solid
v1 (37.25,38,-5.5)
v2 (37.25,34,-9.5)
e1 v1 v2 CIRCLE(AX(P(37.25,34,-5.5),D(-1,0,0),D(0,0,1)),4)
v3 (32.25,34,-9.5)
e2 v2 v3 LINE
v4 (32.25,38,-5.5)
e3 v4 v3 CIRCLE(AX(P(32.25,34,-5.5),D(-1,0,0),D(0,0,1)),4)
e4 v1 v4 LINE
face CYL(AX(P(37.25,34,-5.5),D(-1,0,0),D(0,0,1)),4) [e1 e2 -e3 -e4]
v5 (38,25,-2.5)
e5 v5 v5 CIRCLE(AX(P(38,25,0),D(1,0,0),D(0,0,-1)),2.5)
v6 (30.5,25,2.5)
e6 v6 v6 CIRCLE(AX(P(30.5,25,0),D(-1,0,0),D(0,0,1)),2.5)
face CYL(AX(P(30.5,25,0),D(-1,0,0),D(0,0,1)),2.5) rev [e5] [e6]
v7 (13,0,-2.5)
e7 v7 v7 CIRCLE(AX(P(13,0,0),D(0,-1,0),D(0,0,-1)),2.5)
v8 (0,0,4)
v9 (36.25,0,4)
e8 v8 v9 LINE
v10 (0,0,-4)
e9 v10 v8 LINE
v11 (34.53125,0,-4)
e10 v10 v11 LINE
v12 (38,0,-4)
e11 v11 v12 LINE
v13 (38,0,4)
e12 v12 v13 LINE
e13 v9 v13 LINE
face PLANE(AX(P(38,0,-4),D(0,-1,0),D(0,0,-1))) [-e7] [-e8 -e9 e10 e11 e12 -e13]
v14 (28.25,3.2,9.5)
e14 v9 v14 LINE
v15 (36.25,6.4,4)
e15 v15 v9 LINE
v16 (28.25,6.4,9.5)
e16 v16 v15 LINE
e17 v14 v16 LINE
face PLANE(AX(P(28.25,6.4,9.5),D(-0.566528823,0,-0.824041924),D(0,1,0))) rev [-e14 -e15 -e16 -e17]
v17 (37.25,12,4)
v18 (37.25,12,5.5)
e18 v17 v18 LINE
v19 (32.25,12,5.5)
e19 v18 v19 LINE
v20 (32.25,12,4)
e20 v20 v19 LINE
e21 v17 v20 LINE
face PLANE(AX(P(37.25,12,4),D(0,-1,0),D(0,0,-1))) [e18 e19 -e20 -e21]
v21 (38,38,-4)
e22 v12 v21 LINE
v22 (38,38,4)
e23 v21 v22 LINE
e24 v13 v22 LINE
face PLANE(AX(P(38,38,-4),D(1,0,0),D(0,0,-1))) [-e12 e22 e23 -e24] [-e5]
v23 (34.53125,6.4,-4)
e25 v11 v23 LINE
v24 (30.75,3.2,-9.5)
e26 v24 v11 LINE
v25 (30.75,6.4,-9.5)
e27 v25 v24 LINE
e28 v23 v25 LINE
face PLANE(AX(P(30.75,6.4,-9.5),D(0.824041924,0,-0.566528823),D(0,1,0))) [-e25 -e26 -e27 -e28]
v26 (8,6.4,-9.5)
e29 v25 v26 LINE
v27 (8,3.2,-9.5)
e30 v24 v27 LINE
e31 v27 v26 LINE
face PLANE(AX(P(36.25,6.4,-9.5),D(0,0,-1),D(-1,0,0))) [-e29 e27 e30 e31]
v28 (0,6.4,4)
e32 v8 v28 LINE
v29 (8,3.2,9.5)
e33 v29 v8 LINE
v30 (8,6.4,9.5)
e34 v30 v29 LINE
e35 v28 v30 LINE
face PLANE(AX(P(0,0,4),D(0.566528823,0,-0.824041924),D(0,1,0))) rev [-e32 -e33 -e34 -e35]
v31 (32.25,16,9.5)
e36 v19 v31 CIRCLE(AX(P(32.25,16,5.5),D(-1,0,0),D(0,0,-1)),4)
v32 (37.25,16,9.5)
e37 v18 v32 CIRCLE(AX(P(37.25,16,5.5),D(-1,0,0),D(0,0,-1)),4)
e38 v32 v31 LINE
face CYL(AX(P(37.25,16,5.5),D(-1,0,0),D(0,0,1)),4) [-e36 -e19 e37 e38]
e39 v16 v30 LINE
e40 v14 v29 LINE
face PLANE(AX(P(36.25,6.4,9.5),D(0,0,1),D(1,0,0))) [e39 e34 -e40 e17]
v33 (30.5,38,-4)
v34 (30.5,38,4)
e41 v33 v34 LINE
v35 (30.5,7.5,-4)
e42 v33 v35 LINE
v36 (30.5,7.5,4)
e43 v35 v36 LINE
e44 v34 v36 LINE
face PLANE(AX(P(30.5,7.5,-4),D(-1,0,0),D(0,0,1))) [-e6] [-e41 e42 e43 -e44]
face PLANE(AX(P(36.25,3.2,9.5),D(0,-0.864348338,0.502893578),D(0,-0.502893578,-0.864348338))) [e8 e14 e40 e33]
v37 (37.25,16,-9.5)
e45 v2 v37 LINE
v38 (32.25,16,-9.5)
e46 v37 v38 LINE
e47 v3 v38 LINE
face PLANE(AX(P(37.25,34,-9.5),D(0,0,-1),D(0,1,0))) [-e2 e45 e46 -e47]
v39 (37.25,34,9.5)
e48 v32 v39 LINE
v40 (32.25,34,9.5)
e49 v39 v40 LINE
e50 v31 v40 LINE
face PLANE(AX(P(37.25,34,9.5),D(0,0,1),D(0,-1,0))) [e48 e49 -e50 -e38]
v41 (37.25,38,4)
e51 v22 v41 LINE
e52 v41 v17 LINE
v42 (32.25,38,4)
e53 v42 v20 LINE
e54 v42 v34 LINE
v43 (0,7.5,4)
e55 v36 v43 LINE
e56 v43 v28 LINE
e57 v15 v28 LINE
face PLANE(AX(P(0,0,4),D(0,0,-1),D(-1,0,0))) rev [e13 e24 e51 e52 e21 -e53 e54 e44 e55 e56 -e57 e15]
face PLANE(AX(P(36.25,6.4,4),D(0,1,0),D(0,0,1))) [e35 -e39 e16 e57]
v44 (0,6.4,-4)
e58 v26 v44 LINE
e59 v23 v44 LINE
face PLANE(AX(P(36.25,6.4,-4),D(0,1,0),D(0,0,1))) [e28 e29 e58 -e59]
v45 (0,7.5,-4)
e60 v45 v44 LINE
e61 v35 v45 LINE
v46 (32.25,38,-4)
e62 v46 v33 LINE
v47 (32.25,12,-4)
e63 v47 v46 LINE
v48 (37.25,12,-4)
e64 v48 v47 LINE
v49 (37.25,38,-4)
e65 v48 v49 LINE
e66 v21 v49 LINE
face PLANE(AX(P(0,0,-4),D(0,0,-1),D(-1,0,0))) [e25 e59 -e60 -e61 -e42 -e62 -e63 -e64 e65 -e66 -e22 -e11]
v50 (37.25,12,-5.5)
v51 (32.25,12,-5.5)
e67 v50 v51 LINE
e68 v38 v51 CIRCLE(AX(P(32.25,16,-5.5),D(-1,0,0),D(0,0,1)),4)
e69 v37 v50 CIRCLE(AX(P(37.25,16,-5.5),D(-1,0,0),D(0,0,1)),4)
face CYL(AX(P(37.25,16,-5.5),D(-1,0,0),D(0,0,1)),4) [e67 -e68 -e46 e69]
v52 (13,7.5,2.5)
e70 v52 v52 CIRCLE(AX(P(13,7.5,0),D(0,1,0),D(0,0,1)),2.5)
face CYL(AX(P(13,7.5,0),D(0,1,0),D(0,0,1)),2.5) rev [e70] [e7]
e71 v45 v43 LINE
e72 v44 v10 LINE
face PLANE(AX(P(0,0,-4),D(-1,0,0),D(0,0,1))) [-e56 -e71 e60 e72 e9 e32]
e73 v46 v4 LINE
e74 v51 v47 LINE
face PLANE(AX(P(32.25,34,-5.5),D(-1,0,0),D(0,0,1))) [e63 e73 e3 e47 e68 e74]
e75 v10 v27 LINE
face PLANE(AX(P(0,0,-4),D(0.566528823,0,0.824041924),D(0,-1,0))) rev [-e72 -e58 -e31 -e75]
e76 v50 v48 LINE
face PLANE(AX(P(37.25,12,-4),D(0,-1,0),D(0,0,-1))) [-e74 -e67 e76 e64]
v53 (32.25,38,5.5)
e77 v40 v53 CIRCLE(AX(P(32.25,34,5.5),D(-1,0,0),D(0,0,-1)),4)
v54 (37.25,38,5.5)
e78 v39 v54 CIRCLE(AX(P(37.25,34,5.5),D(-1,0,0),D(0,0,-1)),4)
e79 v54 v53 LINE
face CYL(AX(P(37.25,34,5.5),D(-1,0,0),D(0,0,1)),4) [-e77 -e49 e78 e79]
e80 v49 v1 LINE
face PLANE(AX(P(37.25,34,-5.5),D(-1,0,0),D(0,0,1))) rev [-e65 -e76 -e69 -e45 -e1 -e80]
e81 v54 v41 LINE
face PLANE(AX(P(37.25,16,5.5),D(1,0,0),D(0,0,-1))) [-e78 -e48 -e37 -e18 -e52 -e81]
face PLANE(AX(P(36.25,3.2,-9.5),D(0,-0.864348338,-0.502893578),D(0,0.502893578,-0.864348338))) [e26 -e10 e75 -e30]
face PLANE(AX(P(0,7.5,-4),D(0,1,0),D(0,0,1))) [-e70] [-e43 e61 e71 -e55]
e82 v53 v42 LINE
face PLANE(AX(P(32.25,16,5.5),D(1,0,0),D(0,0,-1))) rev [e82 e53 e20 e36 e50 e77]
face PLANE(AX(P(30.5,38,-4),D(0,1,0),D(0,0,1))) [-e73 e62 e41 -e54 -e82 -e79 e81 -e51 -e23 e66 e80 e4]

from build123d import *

# Parameters (mm, degrees)
EXTRUDE_1_DEPTH        = 4
EXTRUDE_1_DEPTH_BACK   = 4
EXTRUDE_2_DEPTH        = 36.25
CHAMFER_1_SIZE         = 8
CHAMFER_1_SIZE_2       = 5.5
EXTRUDE_3_DEPTH        = 2.5
EXTRUDE_3_DEPTH_BACK   = 2.5
HOLE_WIZARD_M6_1_D     = 5
HOLE_WIZARD_M6_1_DEPTH = 17
HOLE_WIZARD_M6_1_TIP   = 1.502151548
HOLE_WIZARD_M6_2_D     = 5
HOLE_WIZARD_M6_2_DEPTH = 17
HOLE_WIZARD_M6_2_TIP   = 1.502151548


with BuildPart() as part:
    # 草图1 → 凸台-拉伸1 (new, two sides: drawn at the far end of the back side and taken through both)
    with BuildSketch(Plane.XY.offset(-EXTRUDE_1_DEPTH_BACK)):
        Polygon((0, 7.5), (30.5, 7.5), (30.5, 38), (38, 38), (38, 0), (0, 0), align=None)
    extrude(amount=EXTRUDE_1_DEPTH + EXTRUDE_1_DEPTH_BACK)

    # 草图2 → 凸台-拉伸2 (add)
    with BuildSketch(Plane.ZY):
        Polygon((4, 6.4), (9.5, 6.4), (9.5, 3.2), (4, 0), align=None)
        Polygon((-4, 0), (-4, 6.4), (-9.5, 6.4), (-9.5, 3.2), align=None)
    extrude(amount=-EXTRUDE_2_DEPTH)

    # 倒角1
    # the kernel refuses this chamfer: 8, 5.5 mm, written as the material it takes off along each edge
    with BuildSketch(Plane(origin=(36.25, 27.064204354, -9.5), x_dir=(0.021932761143399794, 0, 0.9997594480616957), z_dir=(0, -1, 0))) as chamfer_1_piece_1_section:
        Polygon((CHAMFER_1_SIZE * 0.999759448062, CHAMFER_1_SIZE * 0.0219327611434), (-CHAMFER_1_SIZE_2 * 0.0219327611434, CHAMFER_1_SIZE_2 * 0.999759448062), (0, 0), align=None)
    chamfer_1_piece_1 = extrude(amount=44.528408708, mode=Mode.PRIVATE)
    chamfer_1_piece_1 = split(chamfer_1_piece_1, bisect_by=Plane(origin=(34.285815681, 4.8, -4), z_dir=(0, 0, -1)), keep=Keep.TOP, mode=Mode.PRIVATE)
    add(chamfer_1_piece_1, mode=Mode.SUBTRACT)
    with BuildSketch(Plane(origin=(36.25, 27.064204354, 9.5), x_dir=(0.046364447759701236, 0, -0.9989245907394302), z_dir=(0, -1, 0))) as chamfer_1_piece_2_section:
        Polygon((CHAMFER_1_SIZE_2 * 0.998924590739, -CHAMFER_1_SIZE_2 * 0.0463644477597), (-CHAMFER_1_SIZE * 0.0463644477597, -CHAMFER_1_SIZE * 0.998924590739), (0, 0), align=None)
    chamfer_1_piece_2 = extrude(amount=44.528408708, mode=Mode.PRIVATE)
    chamfer_1_piece_2 = split(chamfer_1_piece_2, bisect_by=Plane(origin=(33.577095366, 4.8, 4), z_dir=(0, 0, 1)), keep=Keep.TOP, mode=Mode.PRIVATE)
    add(chamfer_1_piece_2, mode=Mode.SUBTRACT)
    with BuildSketch(Plane(origin=(0, 27.064204354, 9.5), x_dir=(-0.046364447759701714, 0, -0.9989245907394302), z_dir=(0, -1, 0))) as chamfer_1_piece_3:
        Polygon((CHAMFER_1_SIZE_2 * 0.998924590739, CHAMFER_1_SIZE_2 * 0.0463644477597), (-CHAMFER_1_SIZE * 0.0463644477597, CHAMFER_1_SIZE * 0.998924590739), (0, 0), align=None)
    extrude(amount=44.528408708, mode=Mode.SUBTRACT)
    with BuildSketch(Plane(origin=(0, 27.064204354, -9.5), x_dir=(-0.046364447759701714, 0, 0.9989245907394302), z_dir=(0, -1, 0))) as chamfer_1_piece_4:
        Polygon((CHAMFER_1_SIZE_2 * 0.998924590739, -CHAMFER_1_SIZE_2 * 0.0463644477597), (-CHAMFER_1_SIZE * 0.0463644477597, -CHAMFER_1_SIZE * 0.998924590739), (0, 0), align=None)
    extrude(amount=44.528408708, mode=Mode.SUBTRACT)

    # 草图3 → 凸台-拉伸3 (add, two sides: drawn at the far end of the back side and taken through both)
    with BuildSketch(Plane.ZY.offset(-34.75).offset(-EXTRUDE_3_DEPTH_BACK)):
        with BuildLine():
            Line((4, 38), (5.5, 38))
            ThreePointArc((5.5, 38), (8.328427125, 36.828427125), (9.5, 34))
            Line((9.5, 34), (9.5, 16))
            ThreePointArc((9.5, 16), (8.328427125, 13.171572875), (5.5, 12))
            Line((5.5, 12), (4, 12))
            Line((4, 12), (4, 38))
        make_face()
        with BuildLine():
            Line((-9.5, 34), (-9.5, 16))
            ThreePointArc((-9.5, 16), (-8.328427125, 13.171572875), (-5.5, 12))
            Line((-5.5, 12), (-4, 12))
            Line((-4, 12), (-4, 38))
            Line((-4, 38), (-5.5, 38))
            ThreePointArc((-5.5, 38), (-8.328427125, 36.828427125), (-9.5, 34))
        make_face()
    extrude(amount=EXTRUDE_3_DEPTH + EXTRUDE_3_DEPTH_BACK)

    # M6 螺纹孔1
    with Locations(Plane(origin=(30.5, 25, 0), x_dir=(0, 0, -1), z_dir=(-1, 0, 0))):
        with Locations((0, 0)):
            Hole(HOLE_WIZARD_M6_1_D / 2, depth=HOLE_WIZARD_M6_1_DEPTH)
            with Locations((0, 0, -(HOLE_WIZARD_M6_1_DEPTH + HOLE_WIZARD_M6_1_TIP / 2))):  # 118° drill point
                Cone(0, HOLE_WIZARD_M6_1_D / 2, HOLE_WIZARD_M6_1_TIP, mode=Mode.SUBTRACT)

    # M6 螺纹孔2
    with Locations(Plane(origin=(13, 7.5, 0), x_dir=(0, 0, 1), z_dir=(0, 1, 0))):
        with Locations((0, 0)):
            Hole(HOLE_WIZARD_M6_2_D / 2, depth=HOLE_WIZARD_M6_2_DEPTH)
            with Locations((0, 0, -(HOLE_WIZARD_M6_2_DEPTH + HOLE_WIZARD_M6_2_TIP / 2))):  # 118° drill point
                Cone(0, HOLE_WIZARD_M6_2_D / 2, HOLE_WIZARD_M6_2_TIP, mode=Mode.SUBTRACT)


solid = part.part
